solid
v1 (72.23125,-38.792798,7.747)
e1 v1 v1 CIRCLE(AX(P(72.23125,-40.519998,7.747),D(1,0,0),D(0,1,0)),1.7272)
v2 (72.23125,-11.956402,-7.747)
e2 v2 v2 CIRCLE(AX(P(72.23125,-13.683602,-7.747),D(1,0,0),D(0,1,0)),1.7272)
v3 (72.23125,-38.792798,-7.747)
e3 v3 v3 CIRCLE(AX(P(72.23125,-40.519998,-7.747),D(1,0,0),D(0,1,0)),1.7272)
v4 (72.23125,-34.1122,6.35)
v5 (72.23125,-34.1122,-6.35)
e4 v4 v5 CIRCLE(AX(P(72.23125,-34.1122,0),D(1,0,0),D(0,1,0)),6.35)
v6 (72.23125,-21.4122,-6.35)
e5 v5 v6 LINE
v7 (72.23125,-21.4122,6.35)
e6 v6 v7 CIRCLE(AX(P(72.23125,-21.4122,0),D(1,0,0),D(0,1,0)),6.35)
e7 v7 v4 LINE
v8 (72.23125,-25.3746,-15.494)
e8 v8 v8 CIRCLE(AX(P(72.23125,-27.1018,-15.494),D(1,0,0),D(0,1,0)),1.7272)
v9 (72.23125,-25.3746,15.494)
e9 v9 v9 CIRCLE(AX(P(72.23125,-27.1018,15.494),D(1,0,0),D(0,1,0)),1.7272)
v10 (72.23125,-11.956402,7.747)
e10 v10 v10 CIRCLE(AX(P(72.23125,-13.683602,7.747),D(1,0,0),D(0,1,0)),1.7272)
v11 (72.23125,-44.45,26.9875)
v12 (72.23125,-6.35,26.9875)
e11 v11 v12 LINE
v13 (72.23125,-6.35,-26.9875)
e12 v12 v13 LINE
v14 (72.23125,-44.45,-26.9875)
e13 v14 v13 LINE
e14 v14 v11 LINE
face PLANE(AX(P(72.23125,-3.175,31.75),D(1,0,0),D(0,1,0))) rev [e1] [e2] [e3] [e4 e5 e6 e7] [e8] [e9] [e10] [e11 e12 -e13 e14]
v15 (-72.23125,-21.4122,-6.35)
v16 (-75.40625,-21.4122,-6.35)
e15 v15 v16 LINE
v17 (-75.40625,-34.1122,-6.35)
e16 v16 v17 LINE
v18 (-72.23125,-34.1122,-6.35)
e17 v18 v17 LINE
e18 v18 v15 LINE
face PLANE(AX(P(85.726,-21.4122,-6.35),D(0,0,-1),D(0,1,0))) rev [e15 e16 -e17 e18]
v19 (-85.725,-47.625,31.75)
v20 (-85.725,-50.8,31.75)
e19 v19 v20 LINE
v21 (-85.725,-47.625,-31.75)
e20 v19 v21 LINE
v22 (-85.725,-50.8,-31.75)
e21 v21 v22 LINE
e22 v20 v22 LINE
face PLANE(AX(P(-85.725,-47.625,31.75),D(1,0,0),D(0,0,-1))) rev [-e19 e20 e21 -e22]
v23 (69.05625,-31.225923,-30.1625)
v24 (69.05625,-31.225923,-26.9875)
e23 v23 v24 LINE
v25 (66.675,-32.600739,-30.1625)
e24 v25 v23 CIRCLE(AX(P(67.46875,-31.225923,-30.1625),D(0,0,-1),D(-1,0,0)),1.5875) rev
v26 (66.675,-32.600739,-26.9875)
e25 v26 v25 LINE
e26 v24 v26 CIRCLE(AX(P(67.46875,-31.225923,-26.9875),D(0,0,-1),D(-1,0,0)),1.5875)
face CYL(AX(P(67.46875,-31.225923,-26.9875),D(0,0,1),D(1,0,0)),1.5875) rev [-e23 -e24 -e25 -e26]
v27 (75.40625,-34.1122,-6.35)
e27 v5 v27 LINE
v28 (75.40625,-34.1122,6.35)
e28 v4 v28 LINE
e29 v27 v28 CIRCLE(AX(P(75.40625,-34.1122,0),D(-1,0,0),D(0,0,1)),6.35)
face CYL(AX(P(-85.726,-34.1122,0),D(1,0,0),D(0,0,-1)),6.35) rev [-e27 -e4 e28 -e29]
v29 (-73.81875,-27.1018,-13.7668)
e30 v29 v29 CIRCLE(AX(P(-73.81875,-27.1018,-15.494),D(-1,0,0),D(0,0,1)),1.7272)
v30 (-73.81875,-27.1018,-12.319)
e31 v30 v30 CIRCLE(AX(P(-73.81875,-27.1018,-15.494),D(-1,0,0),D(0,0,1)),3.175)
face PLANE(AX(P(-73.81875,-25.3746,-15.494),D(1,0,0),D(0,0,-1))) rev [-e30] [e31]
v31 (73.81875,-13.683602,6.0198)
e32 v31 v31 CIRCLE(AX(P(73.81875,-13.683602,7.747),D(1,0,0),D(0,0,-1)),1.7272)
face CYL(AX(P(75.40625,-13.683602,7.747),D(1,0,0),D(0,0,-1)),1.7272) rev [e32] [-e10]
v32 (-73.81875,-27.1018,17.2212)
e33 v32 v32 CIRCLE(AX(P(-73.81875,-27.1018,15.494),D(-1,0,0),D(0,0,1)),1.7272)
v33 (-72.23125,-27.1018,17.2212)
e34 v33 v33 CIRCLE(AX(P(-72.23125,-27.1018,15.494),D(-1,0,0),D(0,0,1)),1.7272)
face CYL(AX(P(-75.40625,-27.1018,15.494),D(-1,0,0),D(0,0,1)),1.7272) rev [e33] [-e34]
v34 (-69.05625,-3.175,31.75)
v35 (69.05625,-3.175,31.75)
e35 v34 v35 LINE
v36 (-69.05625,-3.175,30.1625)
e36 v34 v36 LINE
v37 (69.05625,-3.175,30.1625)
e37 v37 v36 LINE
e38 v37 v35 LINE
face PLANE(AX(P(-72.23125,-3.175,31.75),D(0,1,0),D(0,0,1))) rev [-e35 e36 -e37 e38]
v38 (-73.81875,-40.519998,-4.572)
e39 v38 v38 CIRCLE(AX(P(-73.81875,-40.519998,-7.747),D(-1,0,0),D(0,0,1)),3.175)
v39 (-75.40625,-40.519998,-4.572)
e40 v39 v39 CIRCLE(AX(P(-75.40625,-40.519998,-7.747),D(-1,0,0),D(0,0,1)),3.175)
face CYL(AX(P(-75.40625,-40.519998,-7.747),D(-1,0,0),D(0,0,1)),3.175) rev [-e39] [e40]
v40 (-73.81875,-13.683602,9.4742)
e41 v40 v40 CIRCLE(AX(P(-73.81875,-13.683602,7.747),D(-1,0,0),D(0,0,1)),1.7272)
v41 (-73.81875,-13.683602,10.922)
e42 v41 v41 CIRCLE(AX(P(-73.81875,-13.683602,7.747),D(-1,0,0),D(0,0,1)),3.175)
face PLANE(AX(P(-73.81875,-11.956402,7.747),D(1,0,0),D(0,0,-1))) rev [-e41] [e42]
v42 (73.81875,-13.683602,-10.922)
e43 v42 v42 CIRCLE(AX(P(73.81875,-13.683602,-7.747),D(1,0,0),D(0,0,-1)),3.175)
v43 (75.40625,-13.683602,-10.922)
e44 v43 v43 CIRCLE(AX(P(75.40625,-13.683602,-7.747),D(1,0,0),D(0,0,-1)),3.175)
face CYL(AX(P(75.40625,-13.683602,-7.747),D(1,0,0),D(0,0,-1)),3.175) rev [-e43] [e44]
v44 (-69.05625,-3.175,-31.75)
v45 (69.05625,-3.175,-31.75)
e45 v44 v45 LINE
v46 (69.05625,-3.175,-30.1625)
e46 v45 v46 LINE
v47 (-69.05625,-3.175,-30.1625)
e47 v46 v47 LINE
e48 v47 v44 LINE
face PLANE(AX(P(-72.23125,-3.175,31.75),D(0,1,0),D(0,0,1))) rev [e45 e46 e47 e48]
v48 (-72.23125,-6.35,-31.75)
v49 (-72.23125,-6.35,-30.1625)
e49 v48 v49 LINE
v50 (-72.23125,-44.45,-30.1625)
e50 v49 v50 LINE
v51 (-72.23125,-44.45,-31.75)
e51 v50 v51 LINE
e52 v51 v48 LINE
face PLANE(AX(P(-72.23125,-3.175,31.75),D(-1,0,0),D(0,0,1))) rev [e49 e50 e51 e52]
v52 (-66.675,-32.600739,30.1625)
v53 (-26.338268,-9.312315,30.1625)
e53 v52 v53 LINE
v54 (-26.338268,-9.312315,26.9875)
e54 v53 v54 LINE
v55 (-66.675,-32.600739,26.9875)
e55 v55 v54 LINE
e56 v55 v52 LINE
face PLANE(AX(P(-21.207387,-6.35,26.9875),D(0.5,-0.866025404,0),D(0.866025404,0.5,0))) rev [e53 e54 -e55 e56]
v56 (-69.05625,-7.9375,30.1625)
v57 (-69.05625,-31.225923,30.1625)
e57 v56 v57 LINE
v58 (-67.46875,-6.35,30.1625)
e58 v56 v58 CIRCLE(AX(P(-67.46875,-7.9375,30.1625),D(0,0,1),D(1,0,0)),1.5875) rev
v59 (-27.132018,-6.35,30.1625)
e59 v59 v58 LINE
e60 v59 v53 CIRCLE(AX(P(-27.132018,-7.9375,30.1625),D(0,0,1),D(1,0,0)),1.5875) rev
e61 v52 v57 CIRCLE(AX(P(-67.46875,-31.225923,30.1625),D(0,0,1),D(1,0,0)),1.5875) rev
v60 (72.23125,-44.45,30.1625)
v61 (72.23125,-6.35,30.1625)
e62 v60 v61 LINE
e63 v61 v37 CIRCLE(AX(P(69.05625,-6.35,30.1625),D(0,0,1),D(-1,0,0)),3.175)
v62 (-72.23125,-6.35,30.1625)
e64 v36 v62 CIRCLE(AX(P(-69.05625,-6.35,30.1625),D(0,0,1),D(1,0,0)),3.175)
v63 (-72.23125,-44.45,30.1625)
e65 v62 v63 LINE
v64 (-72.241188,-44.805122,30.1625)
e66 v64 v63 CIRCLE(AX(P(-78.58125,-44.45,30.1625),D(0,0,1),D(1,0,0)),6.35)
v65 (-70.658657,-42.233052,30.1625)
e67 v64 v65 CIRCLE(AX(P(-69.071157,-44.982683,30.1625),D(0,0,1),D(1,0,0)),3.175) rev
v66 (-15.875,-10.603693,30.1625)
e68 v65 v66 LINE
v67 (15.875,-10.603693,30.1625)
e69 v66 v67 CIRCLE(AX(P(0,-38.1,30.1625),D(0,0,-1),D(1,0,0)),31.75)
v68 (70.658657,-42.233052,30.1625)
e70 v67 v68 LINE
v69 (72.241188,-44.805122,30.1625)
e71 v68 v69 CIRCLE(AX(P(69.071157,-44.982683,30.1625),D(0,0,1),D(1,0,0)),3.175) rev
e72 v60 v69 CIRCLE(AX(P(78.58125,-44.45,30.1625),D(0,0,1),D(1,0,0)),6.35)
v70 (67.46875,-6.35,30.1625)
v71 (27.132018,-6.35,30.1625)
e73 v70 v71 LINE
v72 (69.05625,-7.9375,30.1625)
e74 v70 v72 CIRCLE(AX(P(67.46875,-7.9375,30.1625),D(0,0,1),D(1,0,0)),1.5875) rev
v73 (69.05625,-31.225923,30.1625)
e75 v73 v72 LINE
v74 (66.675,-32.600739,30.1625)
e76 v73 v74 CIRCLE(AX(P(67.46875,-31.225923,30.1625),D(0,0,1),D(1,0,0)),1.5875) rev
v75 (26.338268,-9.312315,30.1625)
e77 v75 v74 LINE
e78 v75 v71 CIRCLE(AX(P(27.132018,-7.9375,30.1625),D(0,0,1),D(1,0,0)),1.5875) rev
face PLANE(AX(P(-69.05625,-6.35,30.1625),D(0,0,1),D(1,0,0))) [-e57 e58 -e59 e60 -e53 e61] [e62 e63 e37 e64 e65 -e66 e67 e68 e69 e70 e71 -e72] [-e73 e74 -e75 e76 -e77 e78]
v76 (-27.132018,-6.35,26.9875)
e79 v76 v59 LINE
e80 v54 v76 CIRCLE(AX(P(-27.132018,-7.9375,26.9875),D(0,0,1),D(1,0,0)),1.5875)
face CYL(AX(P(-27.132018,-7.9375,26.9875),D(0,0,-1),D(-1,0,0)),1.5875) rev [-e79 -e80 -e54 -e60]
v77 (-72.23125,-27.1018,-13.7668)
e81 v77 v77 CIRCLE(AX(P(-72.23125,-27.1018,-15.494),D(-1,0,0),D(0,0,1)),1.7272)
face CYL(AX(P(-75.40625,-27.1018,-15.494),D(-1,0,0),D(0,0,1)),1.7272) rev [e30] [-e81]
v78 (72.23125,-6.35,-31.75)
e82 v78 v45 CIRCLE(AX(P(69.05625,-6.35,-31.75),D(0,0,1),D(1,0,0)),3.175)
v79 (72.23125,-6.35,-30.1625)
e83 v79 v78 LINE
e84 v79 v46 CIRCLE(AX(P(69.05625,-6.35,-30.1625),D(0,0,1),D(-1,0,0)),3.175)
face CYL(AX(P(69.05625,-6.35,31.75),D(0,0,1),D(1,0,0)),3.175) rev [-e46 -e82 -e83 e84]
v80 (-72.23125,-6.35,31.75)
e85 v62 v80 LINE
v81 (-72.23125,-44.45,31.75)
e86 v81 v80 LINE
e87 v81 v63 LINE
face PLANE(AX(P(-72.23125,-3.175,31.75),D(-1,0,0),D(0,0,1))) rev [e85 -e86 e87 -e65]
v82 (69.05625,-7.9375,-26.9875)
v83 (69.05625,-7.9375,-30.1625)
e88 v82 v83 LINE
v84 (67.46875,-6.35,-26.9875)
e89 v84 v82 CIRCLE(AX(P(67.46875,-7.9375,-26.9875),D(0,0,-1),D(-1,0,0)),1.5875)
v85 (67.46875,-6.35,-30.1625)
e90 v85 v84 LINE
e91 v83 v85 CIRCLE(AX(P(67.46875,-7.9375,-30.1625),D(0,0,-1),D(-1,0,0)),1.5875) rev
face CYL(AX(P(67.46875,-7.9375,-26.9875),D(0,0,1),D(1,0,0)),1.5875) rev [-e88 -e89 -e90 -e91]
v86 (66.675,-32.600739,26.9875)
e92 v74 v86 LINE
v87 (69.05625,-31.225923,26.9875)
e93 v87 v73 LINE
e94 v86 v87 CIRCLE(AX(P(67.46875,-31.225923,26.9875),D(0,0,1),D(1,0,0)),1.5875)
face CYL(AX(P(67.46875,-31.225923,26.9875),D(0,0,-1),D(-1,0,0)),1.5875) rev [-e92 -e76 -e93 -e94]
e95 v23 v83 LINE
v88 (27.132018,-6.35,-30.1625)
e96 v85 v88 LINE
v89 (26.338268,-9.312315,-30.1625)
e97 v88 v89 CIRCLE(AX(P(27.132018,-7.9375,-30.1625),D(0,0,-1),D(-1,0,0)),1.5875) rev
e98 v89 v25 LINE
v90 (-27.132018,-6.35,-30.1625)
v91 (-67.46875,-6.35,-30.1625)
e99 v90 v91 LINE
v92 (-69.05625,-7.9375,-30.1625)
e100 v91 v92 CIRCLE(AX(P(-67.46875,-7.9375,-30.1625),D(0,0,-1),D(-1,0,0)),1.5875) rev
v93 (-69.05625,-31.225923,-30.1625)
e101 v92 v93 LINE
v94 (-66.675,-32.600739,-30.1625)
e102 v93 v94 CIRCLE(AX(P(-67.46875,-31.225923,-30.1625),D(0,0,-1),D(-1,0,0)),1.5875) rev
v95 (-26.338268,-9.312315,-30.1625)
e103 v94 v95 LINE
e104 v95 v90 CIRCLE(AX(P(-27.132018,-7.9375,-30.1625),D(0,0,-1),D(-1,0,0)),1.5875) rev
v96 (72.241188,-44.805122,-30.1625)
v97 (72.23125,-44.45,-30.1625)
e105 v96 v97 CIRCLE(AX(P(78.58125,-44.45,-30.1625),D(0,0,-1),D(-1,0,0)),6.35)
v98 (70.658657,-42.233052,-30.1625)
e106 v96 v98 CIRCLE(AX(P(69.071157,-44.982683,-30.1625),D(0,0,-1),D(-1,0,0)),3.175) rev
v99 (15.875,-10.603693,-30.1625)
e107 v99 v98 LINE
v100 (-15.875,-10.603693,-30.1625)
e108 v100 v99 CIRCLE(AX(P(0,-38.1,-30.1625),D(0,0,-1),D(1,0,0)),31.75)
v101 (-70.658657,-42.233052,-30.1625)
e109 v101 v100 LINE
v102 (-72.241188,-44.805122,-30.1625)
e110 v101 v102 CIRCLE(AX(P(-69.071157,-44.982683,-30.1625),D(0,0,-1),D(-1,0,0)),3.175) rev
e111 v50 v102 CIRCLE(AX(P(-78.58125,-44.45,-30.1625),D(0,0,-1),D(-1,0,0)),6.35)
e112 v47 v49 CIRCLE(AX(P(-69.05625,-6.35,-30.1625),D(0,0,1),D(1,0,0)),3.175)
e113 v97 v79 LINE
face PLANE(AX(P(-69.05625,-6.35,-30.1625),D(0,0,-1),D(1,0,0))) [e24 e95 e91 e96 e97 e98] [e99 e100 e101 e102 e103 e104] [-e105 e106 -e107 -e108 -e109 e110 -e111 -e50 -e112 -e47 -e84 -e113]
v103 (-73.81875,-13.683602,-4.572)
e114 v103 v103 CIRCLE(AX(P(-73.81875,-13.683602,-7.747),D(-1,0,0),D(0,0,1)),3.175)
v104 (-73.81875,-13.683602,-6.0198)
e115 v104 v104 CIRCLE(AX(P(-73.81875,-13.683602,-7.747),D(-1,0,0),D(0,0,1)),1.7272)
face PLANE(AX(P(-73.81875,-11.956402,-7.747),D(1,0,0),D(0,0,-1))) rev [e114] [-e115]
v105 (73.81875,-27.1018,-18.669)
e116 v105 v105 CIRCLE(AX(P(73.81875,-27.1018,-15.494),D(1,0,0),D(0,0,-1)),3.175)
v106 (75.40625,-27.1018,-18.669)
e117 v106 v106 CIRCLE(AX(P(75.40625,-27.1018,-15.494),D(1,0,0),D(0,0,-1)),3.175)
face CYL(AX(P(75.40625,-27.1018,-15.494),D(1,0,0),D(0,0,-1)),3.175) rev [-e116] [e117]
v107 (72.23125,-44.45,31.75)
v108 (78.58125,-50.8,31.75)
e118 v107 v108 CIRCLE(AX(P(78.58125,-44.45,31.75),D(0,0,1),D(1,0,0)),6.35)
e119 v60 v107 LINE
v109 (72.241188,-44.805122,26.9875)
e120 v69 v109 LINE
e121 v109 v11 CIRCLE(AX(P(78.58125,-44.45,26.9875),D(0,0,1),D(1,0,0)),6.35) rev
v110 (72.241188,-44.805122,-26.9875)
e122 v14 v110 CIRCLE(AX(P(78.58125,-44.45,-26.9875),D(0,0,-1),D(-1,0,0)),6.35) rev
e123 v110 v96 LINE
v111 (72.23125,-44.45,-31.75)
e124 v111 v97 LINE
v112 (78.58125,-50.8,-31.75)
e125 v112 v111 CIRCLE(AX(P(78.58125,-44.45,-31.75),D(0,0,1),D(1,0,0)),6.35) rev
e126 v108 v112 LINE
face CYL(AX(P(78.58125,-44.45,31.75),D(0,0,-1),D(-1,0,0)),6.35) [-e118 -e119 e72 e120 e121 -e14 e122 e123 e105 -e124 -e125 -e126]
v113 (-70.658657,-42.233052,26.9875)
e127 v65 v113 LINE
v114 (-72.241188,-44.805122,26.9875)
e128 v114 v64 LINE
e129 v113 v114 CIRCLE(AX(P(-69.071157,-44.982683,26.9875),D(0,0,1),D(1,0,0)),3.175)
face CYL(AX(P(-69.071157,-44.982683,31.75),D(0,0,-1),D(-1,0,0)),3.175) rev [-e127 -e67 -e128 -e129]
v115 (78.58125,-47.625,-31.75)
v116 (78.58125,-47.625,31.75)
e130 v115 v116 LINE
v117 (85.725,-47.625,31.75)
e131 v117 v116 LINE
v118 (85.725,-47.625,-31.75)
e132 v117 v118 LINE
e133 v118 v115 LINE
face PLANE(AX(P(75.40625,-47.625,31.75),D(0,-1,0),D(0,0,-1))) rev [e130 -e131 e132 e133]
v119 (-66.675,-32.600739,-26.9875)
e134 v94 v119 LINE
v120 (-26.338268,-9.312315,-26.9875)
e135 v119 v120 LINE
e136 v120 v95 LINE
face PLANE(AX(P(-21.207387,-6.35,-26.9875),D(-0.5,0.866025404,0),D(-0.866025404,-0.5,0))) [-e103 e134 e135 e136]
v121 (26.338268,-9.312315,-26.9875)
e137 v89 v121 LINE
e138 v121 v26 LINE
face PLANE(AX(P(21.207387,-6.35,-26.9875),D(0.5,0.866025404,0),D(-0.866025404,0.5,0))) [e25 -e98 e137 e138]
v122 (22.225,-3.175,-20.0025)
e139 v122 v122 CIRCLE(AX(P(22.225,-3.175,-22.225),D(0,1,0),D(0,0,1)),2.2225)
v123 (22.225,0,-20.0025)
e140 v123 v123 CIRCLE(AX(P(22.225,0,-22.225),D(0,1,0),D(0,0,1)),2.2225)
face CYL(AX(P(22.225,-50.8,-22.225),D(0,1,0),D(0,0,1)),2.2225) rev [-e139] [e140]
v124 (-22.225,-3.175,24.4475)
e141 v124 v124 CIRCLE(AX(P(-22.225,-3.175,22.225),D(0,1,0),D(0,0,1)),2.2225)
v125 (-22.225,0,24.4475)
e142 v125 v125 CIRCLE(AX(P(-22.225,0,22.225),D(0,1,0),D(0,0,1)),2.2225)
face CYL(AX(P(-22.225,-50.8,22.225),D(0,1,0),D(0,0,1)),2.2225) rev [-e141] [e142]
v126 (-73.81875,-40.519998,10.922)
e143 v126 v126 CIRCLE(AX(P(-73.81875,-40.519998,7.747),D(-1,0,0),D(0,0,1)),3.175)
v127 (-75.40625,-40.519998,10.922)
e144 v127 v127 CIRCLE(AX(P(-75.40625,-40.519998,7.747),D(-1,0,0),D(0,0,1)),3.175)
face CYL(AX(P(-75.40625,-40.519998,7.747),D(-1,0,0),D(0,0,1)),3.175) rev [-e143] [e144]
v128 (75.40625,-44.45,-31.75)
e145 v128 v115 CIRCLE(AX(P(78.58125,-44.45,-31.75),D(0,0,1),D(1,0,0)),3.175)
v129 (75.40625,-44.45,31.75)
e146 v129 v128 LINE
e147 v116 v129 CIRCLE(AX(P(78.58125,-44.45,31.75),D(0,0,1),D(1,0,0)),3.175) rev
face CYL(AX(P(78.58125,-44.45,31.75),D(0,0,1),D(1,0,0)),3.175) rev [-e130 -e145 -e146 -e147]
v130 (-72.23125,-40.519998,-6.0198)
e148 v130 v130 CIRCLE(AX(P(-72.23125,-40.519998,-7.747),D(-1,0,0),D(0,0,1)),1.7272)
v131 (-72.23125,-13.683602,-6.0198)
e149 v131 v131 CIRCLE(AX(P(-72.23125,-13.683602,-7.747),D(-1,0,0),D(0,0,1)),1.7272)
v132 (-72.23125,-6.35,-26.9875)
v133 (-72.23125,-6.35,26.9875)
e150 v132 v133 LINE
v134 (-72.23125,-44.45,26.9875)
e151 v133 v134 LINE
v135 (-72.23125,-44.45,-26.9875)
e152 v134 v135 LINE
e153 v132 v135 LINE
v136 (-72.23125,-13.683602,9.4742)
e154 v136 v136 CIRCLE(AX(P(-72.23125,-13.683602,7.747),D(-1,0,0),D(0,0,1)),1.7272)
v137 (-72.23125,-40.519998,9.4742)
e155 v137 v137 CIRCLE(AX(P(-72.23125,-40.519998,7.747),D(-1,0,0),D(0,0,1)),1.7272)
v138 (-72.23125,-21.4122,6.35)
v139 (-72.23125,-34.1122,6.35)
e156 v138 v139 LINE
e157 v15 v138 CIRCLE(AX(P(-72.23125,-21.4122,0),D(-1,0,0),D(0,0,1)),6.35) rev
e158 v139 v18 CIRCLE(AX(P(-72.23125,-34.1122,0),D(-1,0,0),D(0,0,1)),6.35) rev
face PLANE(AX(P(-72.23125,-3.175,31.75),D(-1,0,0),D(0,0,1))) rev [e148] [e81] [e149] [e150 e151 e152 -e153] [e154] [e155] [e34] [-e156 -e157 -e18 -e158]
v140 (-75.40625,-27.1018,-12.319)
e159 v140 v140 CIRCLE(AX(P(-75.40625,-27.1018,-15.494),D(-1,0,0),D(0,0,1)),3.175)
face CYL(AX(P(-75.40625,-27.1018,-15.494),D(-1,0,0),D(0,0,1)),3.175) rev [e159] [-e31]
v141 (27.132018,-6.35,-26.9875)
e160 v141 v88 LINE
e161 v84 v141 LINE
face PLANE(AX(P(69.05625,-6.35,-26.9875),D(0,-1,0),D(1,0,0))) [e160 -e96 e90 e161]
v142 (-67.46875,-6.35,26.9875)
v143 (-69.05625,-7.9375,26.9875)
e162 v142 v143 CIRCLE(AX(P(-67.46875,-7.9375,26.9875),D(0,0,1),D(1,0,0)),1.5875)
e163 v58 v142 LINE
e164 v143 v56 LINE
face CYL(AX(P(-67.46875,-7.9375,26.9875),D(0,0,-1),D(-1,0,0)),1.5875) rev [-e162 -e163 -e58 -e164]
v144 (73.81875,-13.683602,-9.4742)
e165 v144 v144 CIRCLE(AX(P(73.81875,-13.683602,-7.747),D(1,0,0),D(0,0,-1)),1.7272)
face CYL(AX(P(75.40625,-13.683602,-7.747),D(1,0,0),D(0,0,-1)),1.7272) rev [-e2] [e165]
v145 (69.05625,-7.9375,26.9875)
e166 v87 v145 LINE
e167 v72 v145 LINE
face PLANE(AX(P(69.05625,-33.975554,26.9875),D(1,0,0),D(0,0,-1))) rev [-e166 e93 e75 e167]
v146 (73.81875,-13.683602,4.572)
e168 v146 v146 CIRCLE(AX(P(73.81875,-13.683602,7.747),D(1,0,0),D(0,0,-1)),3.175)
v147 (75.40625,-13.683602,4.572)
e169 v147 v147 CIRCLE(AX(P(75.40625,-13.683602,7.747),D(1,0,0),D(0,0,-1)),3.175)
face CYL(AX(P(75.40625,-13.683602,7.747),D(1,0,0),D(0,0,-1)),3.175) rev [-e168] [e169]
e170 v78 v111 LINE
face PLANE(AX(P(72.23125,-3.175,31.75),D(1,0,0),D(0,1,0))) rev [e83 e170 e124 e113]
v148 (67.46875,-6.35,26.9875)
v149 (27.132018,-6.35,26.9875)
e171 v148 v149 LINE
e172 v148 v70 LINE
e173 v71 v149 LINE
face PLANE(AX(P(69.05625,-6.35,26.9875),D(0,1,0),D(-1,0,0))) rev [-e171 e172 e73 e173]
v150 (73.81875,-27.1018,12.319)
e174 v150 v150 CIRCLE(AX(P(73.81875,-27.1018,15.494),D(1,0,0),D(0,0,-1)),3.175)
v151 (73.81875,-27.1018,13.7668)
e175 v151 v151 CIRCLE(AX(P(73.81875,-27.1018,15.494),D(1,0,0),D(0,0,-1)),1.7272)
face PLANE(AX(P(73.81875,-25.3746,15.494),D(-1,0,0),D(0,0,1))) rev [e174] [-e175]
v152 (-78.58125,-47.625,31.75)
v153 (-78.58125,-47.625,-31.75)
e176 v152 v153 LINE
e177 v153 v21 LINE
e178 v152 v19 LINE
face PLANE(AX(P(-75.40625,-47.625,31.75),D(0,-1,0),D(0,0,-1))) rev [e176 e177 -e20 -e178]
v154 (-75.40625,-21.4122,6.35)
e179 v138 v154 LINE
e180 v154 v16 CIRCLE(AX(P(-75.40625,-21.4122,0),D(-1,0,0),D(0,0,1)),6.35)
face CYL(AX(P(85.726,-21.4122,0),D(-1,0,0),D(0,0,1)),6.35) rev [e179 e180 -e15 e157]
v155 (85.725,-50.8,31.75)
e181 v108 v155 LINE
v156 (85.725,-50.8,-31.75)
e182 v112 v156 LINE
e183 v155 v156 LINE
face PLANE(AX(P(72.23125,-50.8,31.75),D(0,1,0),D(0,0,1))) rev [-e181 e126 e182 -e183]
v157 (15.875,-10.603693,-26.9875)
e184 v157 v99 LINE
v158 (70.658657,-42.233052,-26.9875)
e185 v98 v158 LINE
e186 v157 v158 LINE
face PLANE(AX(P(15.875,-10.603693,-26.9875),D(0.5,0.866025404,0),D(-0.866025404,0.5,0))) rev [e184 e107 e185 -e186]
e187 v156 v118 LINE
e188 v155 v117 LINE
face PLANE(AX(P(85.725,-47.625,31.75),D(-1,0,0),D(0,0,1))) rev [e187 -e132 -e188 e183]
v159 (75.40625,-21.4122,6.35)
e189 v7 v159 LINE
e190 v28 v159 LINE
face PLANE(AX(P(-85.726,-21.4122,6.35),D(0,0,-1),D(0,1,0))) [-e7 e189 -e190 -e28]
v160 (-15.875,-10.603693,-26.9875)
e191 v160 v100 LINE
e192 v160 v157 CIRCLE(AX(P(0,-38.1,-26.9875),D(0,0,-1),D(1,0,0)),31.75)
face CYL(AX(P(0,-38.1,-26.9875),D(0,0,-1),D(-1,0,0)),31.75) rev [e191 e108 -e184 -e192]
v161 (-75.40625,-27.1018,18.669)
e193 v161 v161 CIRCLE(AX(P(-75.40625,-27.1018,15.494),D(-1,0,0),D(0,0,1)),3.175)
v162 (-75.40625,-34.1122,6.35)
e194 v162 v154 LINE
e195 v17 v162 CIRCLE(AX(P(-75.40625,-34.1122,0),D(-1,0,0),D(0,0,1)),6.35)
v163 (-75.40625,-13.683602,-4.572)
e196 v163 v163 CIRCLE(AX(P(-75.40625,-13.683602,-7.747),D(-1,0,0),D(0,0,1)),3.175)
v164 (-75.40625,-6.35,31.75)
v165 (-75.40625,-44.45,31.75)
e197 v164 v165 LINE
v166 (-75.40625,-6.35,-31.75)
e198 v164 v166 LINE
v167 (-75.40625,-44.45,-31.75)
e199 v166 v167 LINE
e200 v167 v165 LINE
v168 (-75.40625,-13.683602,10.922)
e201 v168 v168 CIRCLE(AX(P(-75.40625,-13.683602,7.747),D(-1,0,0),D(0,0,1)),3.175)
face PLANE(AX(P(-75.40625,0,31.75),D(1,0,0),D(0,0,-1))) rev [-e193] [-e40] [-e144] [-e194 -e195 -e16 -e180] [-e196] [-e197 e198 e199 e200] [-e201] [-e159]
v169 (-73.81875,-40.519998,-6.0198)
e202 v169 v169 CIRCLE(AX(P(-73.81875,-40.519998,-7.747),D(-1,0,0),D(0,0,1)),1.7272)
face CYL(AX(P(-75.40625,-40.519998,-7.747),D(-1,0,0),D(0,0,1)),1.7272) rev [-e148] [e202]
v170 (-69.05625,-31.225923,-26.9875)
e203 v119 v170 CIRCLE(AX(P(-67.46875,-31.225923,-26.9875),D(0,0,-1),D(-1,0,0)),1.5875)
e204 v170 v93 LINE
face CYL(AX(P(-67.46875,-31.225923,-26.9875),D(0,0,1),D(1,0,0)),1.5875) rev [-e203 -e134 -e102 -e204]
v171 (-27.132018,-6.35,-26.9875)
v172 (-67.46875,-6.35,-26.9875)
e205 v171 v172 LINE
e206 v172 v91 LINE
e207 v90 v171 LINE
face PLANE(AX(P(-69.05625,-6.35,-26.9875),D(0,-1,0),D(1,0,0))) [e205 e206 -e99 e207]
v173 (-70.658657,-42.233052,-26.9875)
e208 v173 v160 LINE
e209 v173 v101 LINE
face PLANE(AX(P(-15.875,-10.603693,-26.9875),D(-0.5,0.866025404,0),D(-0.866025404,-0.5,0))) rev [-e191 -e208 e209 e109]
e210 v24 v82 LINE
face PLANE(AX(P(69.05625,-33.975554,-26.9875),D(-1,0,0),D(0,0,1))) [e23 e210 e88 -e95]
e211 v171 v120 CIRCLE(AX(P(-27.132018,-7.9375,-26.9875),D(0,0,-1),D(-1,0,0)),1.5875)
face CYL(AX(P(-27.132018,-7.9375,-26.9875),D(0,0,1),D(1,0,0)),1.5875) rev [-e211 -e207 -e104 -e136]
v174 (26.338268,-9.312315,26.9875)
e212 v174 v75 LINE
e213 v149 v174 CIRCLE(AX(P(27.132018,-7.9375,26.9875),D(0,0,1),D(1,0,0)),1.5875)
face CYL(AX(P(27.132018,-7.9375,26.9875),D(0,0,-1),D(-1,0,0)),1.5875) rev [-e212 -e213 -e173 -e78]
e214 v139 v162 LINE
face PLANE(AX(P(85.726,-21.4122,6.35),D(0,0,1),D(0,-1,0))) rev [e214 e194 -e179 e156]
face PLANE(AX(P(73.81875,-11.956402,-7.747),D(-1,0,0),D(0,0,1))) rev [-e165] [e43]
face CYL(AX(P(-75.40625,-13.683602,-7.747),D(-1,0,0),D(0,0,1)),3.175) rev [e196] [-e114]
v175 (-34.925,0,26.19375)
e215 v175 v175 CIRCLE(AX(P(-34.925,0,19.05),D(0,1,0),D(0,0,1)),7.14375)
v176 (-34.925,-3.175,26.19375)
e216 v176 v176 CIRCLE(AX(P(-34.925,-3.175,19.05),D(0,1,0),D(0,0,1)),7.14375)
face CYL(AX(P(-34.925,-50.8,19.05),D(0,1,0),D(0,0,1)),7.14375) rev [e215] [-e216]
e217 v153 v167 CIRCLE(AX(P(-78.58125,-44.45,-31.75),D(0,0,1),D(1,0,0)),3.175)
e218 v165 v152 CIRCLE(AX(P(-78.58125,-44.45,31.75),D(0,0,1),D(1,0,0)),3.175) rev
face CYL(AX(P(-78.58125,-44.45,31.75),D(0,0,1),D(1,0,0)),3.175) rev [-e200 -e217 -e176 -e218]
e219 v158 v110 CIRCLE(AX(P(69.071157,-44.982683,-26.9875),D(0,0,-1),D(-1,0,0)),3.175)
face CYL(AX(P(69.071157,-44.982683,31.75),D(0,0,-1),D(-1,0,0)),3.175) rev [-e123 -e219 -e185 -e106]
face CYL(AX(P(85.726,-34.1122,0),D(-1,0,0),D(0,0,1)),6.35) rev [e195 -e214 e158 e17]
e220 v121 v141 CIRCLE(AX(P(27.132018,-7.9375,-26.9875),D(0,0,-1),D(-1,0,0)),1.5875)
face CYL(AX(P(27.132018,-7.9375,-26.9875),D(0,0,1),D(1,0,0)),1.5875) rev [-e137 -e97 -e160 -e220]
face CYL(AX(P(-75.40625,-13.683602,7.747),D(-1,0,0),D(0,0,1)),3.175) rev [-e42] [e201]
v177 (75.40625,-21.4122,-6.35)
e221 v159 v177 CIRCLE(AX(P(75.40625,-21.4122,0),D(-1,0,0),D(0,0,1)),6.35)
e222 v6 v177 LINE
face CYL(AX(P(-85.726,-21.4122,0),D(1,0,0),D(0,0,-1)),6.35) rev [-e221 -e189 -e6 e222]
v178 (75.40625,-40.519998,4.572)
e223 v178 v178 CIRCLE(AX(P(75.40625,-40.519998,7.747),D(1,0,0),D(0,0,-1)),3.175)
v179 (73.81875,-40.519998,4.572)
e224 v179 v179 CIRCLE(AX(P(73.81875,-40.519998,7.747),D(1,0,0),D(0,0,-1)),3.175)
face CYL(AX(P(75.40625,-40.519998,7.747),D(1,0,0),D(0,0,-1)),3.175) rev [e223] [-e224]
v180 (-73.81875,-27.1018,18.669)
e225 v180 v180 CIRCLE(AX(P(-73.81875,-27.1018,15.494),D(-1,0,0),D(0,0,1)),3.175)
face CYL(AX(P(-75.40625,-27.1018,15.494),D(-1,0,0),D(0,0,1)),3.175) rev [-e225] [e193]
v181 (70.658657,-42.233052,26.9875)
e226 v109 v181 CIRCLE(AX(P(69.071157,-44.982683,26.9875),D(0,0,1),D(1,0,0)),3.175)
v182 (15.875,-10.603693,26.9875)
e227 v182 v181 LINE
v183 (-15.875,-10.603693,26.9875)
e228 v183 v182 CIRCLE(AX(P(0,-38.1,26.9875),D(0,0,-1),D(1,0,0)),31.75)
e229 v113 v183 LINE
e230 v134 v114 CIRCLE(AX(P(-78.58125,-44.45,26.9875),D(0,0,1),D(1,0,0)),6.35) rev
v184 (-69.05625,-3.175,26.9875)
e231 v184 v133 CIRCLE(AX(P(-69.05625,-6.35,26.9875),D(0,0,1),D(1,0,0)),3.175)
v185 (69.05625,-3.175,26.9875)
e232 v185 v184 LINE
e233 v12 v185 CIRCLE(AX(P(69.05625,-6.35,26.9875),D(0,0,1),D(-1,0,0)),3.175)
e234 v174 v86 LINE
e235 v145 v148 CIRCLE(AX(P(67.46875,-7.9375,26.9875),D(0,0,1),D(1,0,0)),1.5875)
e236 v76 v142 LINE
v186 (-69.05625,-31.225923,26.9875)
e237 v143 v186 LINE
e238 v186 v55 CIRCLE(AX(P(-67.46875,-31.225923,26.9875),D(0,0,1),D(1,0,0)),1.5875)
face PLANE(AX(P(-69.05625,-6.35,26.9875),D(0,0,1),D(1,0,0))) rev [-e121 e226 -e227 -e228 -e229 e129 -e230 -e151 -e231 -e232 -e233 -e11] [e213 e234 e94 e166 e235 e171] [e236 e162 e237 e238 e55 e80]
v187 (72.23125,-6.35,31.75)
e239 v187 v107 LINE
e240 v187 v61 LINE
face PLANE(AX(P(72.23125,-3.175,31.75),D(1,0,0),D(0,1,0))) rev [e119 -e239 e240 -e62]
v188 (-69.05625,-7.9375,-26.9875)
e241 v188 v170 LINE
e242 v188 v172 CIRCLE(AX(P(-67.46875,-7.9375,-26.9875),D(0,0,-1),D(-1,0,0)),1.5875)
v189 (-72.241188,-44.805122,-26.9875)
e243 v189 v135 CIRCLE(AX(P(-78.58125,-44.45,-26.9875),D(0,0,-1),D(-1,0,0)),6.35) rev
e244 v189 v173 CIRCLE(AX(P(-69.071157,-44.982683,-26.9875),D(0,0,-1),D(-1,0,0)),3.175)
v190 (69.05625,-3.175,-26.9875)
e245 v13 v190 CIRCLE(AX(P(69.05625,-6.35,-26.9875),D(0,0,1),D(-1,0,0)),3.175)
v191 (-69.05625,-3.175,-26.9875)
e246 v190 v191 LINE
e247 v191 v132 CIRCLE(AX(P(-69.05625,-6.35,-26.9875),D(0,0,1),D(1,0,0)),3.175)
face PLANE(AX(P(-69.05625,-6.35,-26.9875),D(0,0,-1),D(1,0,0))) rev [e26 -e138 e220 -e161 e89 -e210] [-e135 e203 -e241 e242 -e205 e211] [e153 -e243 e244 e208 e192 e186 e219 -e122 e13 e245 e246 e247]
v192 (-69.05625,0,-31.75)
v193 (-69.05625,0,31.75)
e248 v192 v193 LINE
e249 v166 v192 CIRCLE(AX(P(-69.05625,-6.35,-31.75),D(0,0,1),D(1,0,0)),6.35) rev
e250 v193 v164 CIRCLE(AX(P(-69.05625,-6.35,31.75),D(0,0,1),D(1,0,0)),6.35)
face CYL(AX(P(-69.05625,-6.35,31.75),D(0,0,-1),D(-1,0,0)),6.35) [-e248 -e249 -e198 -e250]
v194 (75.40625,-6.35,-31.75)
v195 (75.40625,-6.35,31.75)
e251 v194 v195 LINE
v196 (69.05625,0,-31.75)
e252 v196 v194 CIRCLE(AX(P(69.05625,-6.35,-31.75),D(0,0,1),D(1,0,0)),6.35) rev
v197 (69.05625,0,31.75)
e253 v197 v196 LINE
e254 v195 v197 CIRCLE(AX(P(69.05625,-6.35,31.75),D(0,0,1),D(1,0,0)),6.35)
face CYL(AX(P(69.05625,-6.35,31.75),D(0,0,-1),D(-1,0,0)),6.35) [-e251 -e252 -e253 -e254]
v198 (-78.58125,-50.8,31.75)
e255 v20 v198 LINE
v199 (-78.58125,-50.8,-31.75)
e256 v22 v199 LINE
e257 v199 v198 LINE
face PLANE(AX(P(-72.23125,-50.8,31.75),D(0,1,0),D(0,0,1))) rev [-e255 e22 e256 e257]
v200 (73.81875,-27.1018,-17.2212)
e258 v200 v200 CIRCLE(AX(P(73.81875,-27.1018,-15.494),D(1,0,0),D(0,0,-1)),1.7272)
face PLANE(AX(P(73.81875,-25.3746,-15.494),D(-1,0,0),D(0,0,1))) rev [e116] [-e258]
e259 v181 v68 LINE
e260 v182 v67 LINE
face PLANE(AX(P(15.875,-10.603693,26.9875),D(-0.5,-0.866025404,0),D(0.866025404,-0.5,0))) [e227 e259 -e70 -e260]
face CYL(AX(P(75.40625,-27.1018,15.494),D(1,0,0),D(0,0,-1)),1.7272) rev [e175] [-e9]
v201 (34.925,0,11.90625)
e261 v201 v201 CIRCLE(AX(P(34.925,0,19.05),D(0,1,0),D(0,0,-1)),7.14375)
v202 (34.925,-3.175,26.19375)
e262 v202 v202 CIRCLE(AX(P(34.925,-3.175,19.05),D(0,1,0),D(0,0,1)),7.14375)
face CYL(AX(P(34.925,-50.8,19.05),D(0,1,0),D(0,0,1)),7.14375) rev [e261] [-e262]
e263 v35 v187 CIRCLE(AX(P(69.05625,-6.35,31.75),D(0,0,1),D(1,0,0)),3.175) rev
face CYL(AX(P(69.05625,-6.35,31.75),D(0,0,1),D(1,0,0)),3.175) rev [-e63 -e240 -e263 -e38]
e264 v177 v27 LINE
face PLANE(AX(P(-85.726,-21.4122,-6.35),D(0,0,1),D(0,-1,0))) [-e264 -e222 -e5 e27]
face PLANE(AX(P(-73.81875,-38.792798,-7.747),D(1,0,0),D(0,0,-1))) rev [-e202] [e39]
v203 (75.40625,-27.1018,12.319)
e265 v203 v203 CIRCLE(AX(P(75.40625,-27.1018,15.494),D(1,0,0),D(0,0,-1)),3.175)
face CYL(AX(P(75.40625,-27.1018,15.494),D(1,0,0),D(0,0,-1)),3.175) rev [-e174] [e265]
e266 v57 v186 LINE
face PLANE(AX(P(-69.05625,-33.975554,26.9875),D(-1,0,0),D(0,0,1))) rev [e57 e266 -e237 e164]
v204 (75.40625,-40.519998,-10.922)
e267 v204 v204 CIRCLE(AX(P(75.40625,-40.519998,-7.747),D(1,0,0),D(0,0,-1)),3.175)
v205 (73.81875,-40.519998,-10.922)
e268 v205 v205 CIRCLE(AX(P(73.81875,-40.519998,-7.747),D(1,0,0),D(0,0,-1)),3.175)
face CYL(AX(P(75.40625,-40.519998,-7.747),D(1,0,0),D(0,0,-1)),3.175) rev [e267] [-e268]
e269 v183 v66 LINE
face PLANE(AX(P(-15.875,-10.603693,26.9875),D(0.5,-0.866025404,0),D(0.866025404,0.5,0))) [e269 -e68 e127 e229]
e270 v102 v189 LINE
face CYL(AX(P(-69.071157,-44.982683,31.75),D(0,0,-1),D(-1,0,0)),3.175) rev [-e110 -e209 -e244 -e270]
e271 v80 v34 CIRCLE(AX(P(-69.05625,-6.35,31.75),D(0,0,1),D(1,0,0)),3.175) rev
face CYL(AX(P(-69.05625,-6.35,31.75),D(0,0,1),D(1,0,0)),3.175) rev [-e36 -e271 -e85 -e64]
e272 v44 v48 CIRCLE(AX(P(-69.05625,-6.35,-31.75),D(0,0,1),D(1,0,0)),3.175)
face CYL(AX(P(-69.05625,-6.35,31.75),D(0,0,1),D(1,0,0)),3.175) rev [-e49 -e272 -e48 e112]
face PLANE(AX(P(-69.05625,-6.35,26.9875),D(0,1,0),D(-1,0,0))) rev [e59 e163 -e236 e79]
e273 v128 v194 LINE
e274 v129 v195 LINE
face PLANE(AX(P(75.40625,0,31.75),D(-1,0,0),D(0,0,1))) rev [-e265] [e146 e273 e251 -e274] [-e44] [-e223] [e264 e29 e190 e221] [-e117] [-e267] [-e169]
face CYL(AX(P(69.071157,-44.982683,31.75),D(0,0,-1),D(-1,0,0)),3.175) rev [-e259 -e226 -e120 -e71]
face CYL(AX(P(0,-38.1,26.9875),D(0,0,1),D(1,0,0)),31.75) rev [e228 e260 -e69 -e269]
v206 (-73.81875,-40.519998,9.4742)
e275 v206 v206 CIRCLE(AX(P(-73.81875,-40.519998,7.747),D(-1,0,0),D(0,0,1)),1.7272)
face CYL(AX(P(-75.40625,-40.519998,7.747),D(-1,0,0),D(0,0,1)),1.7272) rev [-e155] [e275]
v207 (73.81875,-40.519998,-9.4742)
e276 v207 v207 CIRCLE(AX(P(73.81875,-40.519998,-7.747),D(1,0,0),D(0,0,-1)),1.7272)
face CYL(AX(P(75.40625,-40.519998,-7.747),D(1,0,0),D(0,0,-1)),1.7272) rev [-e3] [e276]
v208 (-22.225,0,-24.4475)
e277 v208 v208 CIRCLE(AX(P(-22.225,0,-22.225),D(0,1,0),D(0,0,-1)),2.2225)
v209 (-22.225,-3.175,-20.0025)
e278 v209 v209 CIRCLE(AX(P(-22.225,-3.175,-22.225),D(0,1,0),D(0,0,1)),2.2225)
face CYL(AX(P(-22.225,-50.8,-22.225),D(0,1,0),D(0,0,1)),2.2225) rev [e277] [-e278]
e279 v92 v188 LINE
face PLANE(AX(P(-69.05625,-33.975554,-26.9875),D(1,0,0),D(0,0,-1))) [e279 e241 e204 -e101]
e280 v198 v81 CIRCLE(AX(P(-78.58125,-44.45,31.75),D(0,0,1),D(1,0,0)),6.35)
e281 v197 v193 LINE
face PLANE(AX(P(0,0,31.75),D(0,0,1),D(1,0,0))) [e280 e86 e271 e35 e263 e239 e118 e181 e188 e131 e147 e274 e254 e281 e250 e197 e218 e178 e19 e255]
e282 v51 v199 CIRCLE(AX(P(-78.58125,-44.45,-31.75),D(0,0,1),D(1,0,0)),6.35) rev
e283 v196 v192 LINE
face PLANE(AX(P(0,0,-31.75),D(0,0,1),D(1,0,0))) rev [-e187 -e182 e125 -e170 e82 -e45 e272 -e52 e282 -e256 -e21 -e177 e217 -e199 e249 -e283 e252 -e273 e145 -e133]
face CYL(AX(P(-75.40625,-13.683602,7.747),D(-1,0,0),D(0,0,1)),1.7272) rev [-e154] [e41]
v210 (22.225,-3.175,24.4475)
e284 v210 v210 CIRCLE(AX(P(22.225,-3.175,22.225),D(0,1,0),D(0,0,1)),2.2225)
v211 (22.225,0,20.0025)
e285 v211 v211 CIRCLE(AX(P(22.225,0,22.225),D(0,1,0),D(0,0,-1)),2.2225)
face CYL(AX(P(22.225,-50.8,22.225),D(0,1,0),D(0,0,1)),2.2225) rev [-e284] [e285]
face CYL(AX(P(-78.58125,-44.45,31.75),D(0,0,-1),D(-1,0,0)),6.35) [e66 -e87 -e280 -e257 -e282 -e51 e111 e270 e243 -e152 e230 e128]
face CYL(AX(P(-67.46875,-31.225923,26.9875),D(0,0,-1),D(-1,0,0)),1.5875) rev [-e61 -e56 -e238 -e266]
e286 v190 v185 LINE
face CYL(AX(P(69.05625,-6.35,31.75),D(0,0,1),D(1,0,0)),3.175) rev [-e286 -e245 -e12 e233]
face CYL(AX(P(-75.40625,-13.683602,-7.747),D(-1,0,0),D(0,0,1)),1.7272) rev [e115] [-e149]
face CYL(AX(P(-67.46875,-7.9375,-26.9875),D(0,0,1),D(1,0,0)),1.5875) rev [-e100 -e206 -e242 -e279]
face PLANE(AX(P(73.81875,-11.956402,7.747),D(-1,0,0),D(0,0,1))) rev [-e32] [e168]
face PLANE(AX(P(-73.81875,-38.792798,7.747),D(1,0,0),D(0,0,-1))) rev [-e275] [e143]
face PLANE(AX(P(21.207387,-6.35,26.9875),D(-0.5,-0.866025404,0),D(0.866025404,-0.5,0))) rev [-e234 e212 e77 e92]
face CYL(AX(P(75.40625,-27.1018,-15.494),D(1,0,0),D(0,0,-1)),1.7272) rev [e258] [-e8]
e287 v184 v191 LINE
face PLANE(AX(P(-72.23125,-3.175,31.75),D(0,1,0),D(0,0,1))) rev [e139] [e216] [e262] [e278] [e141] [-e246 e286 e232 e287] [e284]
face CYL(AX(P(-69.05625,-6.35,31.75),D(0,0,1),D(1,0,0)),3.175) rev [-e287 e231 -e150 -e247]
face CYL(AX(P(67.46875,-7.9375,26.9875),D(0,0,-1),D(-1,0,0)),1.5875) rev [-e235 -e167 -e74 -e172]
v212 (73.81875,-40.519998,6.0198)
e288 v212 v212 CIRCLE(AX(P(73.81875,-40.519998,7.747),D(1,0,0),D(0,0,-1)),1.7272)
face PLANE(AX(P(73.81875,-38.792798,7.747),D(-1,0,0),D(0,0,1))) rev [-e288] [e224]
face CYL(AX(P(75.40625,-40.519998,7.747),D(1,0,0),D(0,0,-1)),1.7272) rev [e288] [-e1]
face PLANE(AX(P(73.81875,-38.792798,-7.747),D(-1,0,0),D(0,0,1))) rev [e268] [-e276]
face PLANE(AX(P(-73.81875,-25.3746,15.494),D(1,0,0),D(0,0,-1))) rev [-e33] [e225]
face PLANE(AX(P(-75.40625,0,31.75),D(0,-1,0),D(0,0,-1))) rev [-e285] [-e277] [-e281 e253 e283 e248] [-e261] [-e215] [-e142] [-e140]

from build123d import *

# Parameters (mm, degrees)
BOSS_EXTRU_1_DEPTH                              = 31.75
CONG_1_R                                        = 6.35
CONG_2_R                                        = 3.175
ESQUISSE4_R                                     = 7.14375
ESQUISSE4_R_2                                   = 2.2225
ENL_V_MAT_EXTRU_1_DEPTH                         = 105.582398734
CHAMBRAGE_POUR_VIS_T_TE_CYLINDRIQUE_D           = 3.4544
CHAMBRAGE_POUR_VIS_T_TE_CYLINDRIQUE_DEPTH       = 3.175
CHAMBRAGE_POUR_VIS_T_TE_CYLINDRIQUE_CBORE_D     = 6.35
CHAMBRAGE_POUR_VIS_T_TE_CYLINDRIQUE_CBORE_DEPTH = 1.5875
R_P_T_START                                     = -75.40625
R_P_T_PAR_COURBE1_OUTLINE_R                     = 3.175
R_P_T_PAR_COURBE1_DEPTH                         = 1.5875
R_P_T_START_2                                   = -73.81875
R_P_T_PAR_COURBE1_2_OUTLINE_R                   = 1.7272
R_P_T_PAR_COURBE1_2_DEPTH                       = 1.5875
ENL_V_MAT_EXTRU_4_REACH                         = 173.907
BOSS_EXTRU_2_START                              = -3.175
BOSS_EXTRU_2_DEPTH                              = 3.175
CONG_3_R                                        = 1.5875
CONG_3_OF_SYM_TRIE2_R                           = 1.5875
CONG_4_R                                        = 3.175


# Read off the part's stored shape, not the designer's step: Répét. par courbe1
with BuildPart() as part:
    # Esquisse3 → Boss.-Extru.1 (new, symmetric)
    with BuildSketch(Plane.XY):
        Polygon((-75.40625, 0), (75.40625, 0), (75.40625, -47.625), (85.725, -47.625), (85.725, -50.8), (72.23125, -50.8), (72.23125, -3.175), (-72.23125, -3.175), (-72.23125, -50.8), (-85.725, -50.8), (-85.725, -47.625), (-75.40625, -47.625), align=None)
    extrude(amount=BOSS_EXTRU_1_DEPTH, both=True)

    # Congé1
    cong_1_edges = [part.edges().sort_by_distance(p)[0] for p in [
        (72.23125, -50.8, 0),
        (-72.23125, -50.8, 0),
        (-75.40625, 0, 0),
        (75.40625, 0, 0),
    ]]
    fillet(cong_1_edges, radius=CONG_1_R)

    # Congé2
    cong_2_edges = [part.edges().sort_by_distance(p)[0] for p in [
        (75.40625, -47.625, 0),
        (72.23125, -3.175, 0),
        (-72.23125, -3.175, 0),
        (-75.40625, -47.625, 0),
    ]]
    fillet(cong_2_edges, radius=CONG_2_R)

    # Esquisse4 → Enlèv. mat.-Extru.1 (cut, through all)
    with BuildSketch(Plane(origin=(0, 0, 0), x_dir=(1, 0, 0), z_dir=(0, 1, 0))):
        with Locations(Location((-34.925, -19.05, 0), (0, 0, 270))):
            Circle(ESQUISSE4_R)
        with Locations(Location((-22.225, -22.225, 0), (0, 0, 270))):
            Circle(ESQUISSE4_R_2)
        with Locations(Location((22.225, -22.225, 0), (0, 0, 270))):
            Circle(ESQUISSE4_R_2)
        with Locations(Location((34.925, -19.05, 0), (0, 0, 270))):
            Circle(ESQUISSE4_R)
        with Locations(Location((22.225, 22.225, 0), (0, 0, 270))):
            Circle(ESQUISSE4_R_2)
        with Locations(Location((-22.225, 22.225, 0), (0, 0, 270))):
            Circle(ESQUISSE4_R_2)
    extrude(amount=-ENL_V_MAT_EXTRU_1_DEPTH, mode=Mode.SUBTRACT)

    # Chambrage pour vis à tête cylindrique à 6 pans creux (vis CHC) #54
    with Locations(Plane.ZY.offset(75.40625)):
        with Locations((-15.494, -27.1018)):
            chambrage_pour_vis_t_te_cylindrique = CounterBoreHole(CHAMBRAGE_POUR_VIS_T_TE_CYLINDRIQUE_D / 2, CHAMBRAGE_POUR_VIS_T_TE_CYLINDRIQUE_CBORE_D / 2, CHAMBRAGE_POUR_VIS_T_TE_CYLINDRIQUE_CBORE_DEPTH, depth=CHAMBRAGE_POUR_VIS_T_TE_CYLINDRIQUE_DEPTH)

    # Répét. par courbe1 outline → Répét. par courbe1 (cut)
    with BuildSketch(Plane.YZ.offset(R_P_T_START)):
        with Locations((-40.519997606, -7.747)):
            Circle(R_P_T_PAR_COURBE1_OUTLINE_R)
        with Locations((-40.519997606, 7.747)):
            Circle(R_P_T_PAR_COURBE1_OUTLINE_R)
        with Locations((-27.1018, 15.494)):
            Circle(R_P_T_PAR_COURBE1_OUTLINE_R)
        with Locations((-13.683602394, 7.747)):
            Circle(R_P_T_PAR_COURBE1_OUTLINE_R)
        with Locations((-13.683602394, -7.747)):
            Circle(R_P_T_PAR_COURBE1_OUTLINE_R)
    r_p_t_par_courbe1 = extrude(amount=R_P_T_PAR_COURBE1_DEPTH, mode=Mode.SUBTRACT)

    # R_p_t. par courbe1 2 outline → R_p_t. par courbe1 2 (cut)
    with BuildSketch(Plane.YZ.offset(R_P_T_START_2)):
        with Locations((-40.519997606, -7.747)):
            Circle(R_P_T_PAR_COURBE1_2_OUTLINE_R)
        with Locations((-40.519997606, 7.747)):
            Circle(R_P_T_PAR_COURBE1_2_OUTLINE_R)
        with Locations((-27.1018, 15.494)):
            Circle(R_P_T_PAR_COURBE1_2_OUTLINE_R)
        with Locations((-13.683602394, 7.747)):
            Circle(R_P_T_PAR_COURBE1_2_OUTLINE_R)
        with Locations((-13.683602394, -7.747)):
            Circle(R_P_T_PAR_COURBE1_2_OUTLINE_R)
    r_p_t_par_courbe1_2 = extrude(amount=R_P_T_PAR_COURBE1_2_DEPTH, mode=Mode.SUBTRACT)

    # Esquisse6 → Enlèv. mat.-Extru.4 (cut, up to next)
    with BuildSketch(Plane.ZY.offset(75.40625), mode=Mode.PRIVATE) as enl_v_mat_extru_4_sk1:
        with BuildLine():
            Line((6.35, -21.4122), (6.35, -34.1122))
            ThreePointArc((6.35, -34.1122), (0, -40.4622), (-6.35, -34.1122))
            Line((-6.35, -34.1122), (-6.35, -21.4122))
            ThreePointArc((-6.35, -21.4122), (0, -15.0622), (6.35, -21.4122))
        make_face()
    enl_v_mat_extru_4_tool1 = extrude(enl_v_mat_extru_4_sk1.sketch, amount=-ENL_V_MAT_EXTRU_4_REACH, mode=Mode.PRIVATE) & part.part
    enl_v_mat_extru_4 = enl_v_mat_extru_4_tool1.solids().sort_by_distance((-75.40625, -27.7622, 0))[0]
    add(enl_v_mat_extru_4, mode=Mode.SUBTRACT)

    # Symétrie1: Chambrage pour vis à tête cylindrique à 6 pans creux (vis CHC) #54, Répét. par courbe1, R_p_t. par courbe1 2, Enlèv. mat.-Extru.4 across plane
    add(chambrage_pour_vis_t_te_cylindrique.mirror(Plane(origin=(0, 0, 0), x_dir=(0, 0, 1), z_dir=(1, 0, 0))), mode=Mode.SUBTRACT)
    add(r_p_t_par_courbe1.mirror(Plane(origin=(0, 0, 0), x_dir=(0, 0, 1), z_dir=(1, 0, 0))), mode=Mode.SUBTRACT)
    add(r_p_t_par_courbe1_2.mirror(Plane(origin=(0, 0, 0), x_dir=(0, 0, 1), z_dir=(1, 0, 0))), mode=Mode.SUBTRACT)
    add(enl_v_mat_extru_4.mirror(Plane(origin=(0, 0, 0), x_dir=(0, 0, 1), z_dir=(1, 0, 0))), mode=Mode.SUBTRACT)

    # Esquisse26 → Boss.-Extru.2 (add)
    with BuildSketch(Plane.XY.offset(30.1625).offset(BOSS_EXTRU_2_START)):
        with BuildLine():
            Line((-15.875, -10.60369343), (-72.23125, -43.140989538))
            Line((-72.23125, -43.140989538), (-72.23125, -6.35))
            ThreePointArc((-72.23125, -6.35), (-71.30131403, -4.10493597), (-69.05625, -3.175))
            Line((-69.05625, -3.175), (69.05625, -3.175))
            ThreePointArc((69.05625, -3.175), (71.30131403, -4.10493597), (72.23125, -6.35))
            Line((72.23125, -6.35), (72.23125, -43.140989538))
            Line((72.23125, -43.140989538), (15.875, -10.60369343))
            ThreePointArc((15.875, -10.60369343), (0, -6.35), (-15.875, -10.60369343))
        make_face()
        Polygon((-69.05625, -6.35), (-21.20738686, -6.35), (-69.05625, -33.975554014), align=None, mode=Mode.SUBTRACT)
        Polygon((21.20738686, -6.35), (69.05625, -33.975554014), (69.05625, -6.35), align=None, mode=Mode.SUBTRACT)
    boss_extru_2 = extrude(amount=BOSS_EXTRU_2_DEPTH)

    # Congé3
    cong_3_edges = [part.edges().sort_by_distance(p)[0] for p in [
        (-69.05625, -6.35, 28.575),
        (-21.20738686, -6.35, 28.575),
        (-69.05625, -33.975554014, 28.575),
        (69.05625, -6.35, 28.575),
        (69.05625, -33.975554014, 28.575),
        (21.20738686, -6.35, 28.575),
    ]]
    fillet(cong_3_edges, radius=CONG_3_R)

    # Symétrie2: Boss.-Extru.2 across plane
    add(boss_extru_2.mirror(Plane.XY))

    # Congé3 of Symétrie2
    cong_3_of_sym_trie2_edges = [part.edges().sort_by_distance(p)[0] for p in [
        (-69.05625, -6.35, -28.575),
        (-21.20738686, -6.35, -28.575),
        (-69.05625, -33.975554014, -28.575),
        (69.05625, -6.35, -28.575),
        (69.05625, -33.975554014, -28.575),
        (21.20738686, -6.35, -28.575),
    ]]
    fillet(cong_3_of_sym_trie2_edges, radius=CONG_3_OF_SYM_TRIE2_R)

    # Congé4
    # the kernel refuses this fillet: 3.175 mm, written as the material it adds along each edge
    with BuildSketch(Plane(origin=(-72.23125, -43.140989538, 26.9875), x_dir=(-0.005971670671685116, -0.9999821694157295, 0), z_dir=(0, 0, 1)), Plane(origin=(72.23125, -43.140989538, -26.9875), x_dir=(0.0059716706716850905, -0.9999821694157296, 0), z_dir=(0, 0, -1))) as cong_4_piece_1:
        with BuildLine():
            CenterArc((1.822789642, 3.171034898), CONG_4_R, 210.34215356, 56.794076382)
            Line((-0.91731196, 1.567143316), (-1.191322121, 1.406754157))
            Line((-1.191322121, 1.406754157), (-0.27401016, -0.160389158))
            Line((-0.27401016, -0.160389158), (0.001896005, -0.317494339))
            ThreePointArc((0.001896005, -0.317494339), (1.310883127, -0.309677359), (1.648299424, -0.31710349))
            Line((1.648299424, -0.31710349), (1.664162171, 0))
        make_face()
    extrude(amount=3.175)
    with BuildSketch(Plane(origin=(72.23125, -43.140989538, 26.9875), x_dir=(0.0059716706716850905, -0.9999821694157296, 0), z_dir=(0, 0, 1))) as cong_4_piece_2:
        with BuildLine():
            CenterArc((1.822789642, -3.171034898), CONG_4_R, 92.863770058, 56.794076382)
            Line((-0.91731196, -1.567143316), (-1.191322121, -1.406754157))
            Line((-1.191322121, -1.406754157), (-0.27401016, 0.160389158))
            Line((-0.27401016, 0.160389158), (0.001896005, 0.317494339))
            ThreePointArc((0.001896005, 0.317494339), (1.310883127, 0.309677359), (1.648299424, 0.31710349))
            Line((1.648299424, 0.31710349), (1.664162171, 0))
        make_face()
    extrude(amount=3.175)
    with BuildSketch(Plane(origin=(-72.23125, -43.140989538, -26.9875), x_dir=(0.8660254037844383, 0.5000000000000007, 0), z_dir=(0, 0, -1))) as cong_4_piece_3:
        with BuildLine():
            CenterArc((1.815874281, 3.175), CONG_4_R, 213.205923618, 56.794076382)
            Line((-0.840672661, 1.436212105), (-1.106327355, 1.262333315))
            ThreePointArc((-1.106327355, 1.262333315), (-0.929468297, 0.974886314), (-0.274963066, -0.15875))
            Line((-0.274963066, -0.15875), (0, -0.3175))
            Line((0, -0.3175), (1.815874281, -0.3175))
            Line((1.815874281, -0.3175), (1.815874281, 0))
        make_face()
    extrude(amount=3.175)


solid = part.part
